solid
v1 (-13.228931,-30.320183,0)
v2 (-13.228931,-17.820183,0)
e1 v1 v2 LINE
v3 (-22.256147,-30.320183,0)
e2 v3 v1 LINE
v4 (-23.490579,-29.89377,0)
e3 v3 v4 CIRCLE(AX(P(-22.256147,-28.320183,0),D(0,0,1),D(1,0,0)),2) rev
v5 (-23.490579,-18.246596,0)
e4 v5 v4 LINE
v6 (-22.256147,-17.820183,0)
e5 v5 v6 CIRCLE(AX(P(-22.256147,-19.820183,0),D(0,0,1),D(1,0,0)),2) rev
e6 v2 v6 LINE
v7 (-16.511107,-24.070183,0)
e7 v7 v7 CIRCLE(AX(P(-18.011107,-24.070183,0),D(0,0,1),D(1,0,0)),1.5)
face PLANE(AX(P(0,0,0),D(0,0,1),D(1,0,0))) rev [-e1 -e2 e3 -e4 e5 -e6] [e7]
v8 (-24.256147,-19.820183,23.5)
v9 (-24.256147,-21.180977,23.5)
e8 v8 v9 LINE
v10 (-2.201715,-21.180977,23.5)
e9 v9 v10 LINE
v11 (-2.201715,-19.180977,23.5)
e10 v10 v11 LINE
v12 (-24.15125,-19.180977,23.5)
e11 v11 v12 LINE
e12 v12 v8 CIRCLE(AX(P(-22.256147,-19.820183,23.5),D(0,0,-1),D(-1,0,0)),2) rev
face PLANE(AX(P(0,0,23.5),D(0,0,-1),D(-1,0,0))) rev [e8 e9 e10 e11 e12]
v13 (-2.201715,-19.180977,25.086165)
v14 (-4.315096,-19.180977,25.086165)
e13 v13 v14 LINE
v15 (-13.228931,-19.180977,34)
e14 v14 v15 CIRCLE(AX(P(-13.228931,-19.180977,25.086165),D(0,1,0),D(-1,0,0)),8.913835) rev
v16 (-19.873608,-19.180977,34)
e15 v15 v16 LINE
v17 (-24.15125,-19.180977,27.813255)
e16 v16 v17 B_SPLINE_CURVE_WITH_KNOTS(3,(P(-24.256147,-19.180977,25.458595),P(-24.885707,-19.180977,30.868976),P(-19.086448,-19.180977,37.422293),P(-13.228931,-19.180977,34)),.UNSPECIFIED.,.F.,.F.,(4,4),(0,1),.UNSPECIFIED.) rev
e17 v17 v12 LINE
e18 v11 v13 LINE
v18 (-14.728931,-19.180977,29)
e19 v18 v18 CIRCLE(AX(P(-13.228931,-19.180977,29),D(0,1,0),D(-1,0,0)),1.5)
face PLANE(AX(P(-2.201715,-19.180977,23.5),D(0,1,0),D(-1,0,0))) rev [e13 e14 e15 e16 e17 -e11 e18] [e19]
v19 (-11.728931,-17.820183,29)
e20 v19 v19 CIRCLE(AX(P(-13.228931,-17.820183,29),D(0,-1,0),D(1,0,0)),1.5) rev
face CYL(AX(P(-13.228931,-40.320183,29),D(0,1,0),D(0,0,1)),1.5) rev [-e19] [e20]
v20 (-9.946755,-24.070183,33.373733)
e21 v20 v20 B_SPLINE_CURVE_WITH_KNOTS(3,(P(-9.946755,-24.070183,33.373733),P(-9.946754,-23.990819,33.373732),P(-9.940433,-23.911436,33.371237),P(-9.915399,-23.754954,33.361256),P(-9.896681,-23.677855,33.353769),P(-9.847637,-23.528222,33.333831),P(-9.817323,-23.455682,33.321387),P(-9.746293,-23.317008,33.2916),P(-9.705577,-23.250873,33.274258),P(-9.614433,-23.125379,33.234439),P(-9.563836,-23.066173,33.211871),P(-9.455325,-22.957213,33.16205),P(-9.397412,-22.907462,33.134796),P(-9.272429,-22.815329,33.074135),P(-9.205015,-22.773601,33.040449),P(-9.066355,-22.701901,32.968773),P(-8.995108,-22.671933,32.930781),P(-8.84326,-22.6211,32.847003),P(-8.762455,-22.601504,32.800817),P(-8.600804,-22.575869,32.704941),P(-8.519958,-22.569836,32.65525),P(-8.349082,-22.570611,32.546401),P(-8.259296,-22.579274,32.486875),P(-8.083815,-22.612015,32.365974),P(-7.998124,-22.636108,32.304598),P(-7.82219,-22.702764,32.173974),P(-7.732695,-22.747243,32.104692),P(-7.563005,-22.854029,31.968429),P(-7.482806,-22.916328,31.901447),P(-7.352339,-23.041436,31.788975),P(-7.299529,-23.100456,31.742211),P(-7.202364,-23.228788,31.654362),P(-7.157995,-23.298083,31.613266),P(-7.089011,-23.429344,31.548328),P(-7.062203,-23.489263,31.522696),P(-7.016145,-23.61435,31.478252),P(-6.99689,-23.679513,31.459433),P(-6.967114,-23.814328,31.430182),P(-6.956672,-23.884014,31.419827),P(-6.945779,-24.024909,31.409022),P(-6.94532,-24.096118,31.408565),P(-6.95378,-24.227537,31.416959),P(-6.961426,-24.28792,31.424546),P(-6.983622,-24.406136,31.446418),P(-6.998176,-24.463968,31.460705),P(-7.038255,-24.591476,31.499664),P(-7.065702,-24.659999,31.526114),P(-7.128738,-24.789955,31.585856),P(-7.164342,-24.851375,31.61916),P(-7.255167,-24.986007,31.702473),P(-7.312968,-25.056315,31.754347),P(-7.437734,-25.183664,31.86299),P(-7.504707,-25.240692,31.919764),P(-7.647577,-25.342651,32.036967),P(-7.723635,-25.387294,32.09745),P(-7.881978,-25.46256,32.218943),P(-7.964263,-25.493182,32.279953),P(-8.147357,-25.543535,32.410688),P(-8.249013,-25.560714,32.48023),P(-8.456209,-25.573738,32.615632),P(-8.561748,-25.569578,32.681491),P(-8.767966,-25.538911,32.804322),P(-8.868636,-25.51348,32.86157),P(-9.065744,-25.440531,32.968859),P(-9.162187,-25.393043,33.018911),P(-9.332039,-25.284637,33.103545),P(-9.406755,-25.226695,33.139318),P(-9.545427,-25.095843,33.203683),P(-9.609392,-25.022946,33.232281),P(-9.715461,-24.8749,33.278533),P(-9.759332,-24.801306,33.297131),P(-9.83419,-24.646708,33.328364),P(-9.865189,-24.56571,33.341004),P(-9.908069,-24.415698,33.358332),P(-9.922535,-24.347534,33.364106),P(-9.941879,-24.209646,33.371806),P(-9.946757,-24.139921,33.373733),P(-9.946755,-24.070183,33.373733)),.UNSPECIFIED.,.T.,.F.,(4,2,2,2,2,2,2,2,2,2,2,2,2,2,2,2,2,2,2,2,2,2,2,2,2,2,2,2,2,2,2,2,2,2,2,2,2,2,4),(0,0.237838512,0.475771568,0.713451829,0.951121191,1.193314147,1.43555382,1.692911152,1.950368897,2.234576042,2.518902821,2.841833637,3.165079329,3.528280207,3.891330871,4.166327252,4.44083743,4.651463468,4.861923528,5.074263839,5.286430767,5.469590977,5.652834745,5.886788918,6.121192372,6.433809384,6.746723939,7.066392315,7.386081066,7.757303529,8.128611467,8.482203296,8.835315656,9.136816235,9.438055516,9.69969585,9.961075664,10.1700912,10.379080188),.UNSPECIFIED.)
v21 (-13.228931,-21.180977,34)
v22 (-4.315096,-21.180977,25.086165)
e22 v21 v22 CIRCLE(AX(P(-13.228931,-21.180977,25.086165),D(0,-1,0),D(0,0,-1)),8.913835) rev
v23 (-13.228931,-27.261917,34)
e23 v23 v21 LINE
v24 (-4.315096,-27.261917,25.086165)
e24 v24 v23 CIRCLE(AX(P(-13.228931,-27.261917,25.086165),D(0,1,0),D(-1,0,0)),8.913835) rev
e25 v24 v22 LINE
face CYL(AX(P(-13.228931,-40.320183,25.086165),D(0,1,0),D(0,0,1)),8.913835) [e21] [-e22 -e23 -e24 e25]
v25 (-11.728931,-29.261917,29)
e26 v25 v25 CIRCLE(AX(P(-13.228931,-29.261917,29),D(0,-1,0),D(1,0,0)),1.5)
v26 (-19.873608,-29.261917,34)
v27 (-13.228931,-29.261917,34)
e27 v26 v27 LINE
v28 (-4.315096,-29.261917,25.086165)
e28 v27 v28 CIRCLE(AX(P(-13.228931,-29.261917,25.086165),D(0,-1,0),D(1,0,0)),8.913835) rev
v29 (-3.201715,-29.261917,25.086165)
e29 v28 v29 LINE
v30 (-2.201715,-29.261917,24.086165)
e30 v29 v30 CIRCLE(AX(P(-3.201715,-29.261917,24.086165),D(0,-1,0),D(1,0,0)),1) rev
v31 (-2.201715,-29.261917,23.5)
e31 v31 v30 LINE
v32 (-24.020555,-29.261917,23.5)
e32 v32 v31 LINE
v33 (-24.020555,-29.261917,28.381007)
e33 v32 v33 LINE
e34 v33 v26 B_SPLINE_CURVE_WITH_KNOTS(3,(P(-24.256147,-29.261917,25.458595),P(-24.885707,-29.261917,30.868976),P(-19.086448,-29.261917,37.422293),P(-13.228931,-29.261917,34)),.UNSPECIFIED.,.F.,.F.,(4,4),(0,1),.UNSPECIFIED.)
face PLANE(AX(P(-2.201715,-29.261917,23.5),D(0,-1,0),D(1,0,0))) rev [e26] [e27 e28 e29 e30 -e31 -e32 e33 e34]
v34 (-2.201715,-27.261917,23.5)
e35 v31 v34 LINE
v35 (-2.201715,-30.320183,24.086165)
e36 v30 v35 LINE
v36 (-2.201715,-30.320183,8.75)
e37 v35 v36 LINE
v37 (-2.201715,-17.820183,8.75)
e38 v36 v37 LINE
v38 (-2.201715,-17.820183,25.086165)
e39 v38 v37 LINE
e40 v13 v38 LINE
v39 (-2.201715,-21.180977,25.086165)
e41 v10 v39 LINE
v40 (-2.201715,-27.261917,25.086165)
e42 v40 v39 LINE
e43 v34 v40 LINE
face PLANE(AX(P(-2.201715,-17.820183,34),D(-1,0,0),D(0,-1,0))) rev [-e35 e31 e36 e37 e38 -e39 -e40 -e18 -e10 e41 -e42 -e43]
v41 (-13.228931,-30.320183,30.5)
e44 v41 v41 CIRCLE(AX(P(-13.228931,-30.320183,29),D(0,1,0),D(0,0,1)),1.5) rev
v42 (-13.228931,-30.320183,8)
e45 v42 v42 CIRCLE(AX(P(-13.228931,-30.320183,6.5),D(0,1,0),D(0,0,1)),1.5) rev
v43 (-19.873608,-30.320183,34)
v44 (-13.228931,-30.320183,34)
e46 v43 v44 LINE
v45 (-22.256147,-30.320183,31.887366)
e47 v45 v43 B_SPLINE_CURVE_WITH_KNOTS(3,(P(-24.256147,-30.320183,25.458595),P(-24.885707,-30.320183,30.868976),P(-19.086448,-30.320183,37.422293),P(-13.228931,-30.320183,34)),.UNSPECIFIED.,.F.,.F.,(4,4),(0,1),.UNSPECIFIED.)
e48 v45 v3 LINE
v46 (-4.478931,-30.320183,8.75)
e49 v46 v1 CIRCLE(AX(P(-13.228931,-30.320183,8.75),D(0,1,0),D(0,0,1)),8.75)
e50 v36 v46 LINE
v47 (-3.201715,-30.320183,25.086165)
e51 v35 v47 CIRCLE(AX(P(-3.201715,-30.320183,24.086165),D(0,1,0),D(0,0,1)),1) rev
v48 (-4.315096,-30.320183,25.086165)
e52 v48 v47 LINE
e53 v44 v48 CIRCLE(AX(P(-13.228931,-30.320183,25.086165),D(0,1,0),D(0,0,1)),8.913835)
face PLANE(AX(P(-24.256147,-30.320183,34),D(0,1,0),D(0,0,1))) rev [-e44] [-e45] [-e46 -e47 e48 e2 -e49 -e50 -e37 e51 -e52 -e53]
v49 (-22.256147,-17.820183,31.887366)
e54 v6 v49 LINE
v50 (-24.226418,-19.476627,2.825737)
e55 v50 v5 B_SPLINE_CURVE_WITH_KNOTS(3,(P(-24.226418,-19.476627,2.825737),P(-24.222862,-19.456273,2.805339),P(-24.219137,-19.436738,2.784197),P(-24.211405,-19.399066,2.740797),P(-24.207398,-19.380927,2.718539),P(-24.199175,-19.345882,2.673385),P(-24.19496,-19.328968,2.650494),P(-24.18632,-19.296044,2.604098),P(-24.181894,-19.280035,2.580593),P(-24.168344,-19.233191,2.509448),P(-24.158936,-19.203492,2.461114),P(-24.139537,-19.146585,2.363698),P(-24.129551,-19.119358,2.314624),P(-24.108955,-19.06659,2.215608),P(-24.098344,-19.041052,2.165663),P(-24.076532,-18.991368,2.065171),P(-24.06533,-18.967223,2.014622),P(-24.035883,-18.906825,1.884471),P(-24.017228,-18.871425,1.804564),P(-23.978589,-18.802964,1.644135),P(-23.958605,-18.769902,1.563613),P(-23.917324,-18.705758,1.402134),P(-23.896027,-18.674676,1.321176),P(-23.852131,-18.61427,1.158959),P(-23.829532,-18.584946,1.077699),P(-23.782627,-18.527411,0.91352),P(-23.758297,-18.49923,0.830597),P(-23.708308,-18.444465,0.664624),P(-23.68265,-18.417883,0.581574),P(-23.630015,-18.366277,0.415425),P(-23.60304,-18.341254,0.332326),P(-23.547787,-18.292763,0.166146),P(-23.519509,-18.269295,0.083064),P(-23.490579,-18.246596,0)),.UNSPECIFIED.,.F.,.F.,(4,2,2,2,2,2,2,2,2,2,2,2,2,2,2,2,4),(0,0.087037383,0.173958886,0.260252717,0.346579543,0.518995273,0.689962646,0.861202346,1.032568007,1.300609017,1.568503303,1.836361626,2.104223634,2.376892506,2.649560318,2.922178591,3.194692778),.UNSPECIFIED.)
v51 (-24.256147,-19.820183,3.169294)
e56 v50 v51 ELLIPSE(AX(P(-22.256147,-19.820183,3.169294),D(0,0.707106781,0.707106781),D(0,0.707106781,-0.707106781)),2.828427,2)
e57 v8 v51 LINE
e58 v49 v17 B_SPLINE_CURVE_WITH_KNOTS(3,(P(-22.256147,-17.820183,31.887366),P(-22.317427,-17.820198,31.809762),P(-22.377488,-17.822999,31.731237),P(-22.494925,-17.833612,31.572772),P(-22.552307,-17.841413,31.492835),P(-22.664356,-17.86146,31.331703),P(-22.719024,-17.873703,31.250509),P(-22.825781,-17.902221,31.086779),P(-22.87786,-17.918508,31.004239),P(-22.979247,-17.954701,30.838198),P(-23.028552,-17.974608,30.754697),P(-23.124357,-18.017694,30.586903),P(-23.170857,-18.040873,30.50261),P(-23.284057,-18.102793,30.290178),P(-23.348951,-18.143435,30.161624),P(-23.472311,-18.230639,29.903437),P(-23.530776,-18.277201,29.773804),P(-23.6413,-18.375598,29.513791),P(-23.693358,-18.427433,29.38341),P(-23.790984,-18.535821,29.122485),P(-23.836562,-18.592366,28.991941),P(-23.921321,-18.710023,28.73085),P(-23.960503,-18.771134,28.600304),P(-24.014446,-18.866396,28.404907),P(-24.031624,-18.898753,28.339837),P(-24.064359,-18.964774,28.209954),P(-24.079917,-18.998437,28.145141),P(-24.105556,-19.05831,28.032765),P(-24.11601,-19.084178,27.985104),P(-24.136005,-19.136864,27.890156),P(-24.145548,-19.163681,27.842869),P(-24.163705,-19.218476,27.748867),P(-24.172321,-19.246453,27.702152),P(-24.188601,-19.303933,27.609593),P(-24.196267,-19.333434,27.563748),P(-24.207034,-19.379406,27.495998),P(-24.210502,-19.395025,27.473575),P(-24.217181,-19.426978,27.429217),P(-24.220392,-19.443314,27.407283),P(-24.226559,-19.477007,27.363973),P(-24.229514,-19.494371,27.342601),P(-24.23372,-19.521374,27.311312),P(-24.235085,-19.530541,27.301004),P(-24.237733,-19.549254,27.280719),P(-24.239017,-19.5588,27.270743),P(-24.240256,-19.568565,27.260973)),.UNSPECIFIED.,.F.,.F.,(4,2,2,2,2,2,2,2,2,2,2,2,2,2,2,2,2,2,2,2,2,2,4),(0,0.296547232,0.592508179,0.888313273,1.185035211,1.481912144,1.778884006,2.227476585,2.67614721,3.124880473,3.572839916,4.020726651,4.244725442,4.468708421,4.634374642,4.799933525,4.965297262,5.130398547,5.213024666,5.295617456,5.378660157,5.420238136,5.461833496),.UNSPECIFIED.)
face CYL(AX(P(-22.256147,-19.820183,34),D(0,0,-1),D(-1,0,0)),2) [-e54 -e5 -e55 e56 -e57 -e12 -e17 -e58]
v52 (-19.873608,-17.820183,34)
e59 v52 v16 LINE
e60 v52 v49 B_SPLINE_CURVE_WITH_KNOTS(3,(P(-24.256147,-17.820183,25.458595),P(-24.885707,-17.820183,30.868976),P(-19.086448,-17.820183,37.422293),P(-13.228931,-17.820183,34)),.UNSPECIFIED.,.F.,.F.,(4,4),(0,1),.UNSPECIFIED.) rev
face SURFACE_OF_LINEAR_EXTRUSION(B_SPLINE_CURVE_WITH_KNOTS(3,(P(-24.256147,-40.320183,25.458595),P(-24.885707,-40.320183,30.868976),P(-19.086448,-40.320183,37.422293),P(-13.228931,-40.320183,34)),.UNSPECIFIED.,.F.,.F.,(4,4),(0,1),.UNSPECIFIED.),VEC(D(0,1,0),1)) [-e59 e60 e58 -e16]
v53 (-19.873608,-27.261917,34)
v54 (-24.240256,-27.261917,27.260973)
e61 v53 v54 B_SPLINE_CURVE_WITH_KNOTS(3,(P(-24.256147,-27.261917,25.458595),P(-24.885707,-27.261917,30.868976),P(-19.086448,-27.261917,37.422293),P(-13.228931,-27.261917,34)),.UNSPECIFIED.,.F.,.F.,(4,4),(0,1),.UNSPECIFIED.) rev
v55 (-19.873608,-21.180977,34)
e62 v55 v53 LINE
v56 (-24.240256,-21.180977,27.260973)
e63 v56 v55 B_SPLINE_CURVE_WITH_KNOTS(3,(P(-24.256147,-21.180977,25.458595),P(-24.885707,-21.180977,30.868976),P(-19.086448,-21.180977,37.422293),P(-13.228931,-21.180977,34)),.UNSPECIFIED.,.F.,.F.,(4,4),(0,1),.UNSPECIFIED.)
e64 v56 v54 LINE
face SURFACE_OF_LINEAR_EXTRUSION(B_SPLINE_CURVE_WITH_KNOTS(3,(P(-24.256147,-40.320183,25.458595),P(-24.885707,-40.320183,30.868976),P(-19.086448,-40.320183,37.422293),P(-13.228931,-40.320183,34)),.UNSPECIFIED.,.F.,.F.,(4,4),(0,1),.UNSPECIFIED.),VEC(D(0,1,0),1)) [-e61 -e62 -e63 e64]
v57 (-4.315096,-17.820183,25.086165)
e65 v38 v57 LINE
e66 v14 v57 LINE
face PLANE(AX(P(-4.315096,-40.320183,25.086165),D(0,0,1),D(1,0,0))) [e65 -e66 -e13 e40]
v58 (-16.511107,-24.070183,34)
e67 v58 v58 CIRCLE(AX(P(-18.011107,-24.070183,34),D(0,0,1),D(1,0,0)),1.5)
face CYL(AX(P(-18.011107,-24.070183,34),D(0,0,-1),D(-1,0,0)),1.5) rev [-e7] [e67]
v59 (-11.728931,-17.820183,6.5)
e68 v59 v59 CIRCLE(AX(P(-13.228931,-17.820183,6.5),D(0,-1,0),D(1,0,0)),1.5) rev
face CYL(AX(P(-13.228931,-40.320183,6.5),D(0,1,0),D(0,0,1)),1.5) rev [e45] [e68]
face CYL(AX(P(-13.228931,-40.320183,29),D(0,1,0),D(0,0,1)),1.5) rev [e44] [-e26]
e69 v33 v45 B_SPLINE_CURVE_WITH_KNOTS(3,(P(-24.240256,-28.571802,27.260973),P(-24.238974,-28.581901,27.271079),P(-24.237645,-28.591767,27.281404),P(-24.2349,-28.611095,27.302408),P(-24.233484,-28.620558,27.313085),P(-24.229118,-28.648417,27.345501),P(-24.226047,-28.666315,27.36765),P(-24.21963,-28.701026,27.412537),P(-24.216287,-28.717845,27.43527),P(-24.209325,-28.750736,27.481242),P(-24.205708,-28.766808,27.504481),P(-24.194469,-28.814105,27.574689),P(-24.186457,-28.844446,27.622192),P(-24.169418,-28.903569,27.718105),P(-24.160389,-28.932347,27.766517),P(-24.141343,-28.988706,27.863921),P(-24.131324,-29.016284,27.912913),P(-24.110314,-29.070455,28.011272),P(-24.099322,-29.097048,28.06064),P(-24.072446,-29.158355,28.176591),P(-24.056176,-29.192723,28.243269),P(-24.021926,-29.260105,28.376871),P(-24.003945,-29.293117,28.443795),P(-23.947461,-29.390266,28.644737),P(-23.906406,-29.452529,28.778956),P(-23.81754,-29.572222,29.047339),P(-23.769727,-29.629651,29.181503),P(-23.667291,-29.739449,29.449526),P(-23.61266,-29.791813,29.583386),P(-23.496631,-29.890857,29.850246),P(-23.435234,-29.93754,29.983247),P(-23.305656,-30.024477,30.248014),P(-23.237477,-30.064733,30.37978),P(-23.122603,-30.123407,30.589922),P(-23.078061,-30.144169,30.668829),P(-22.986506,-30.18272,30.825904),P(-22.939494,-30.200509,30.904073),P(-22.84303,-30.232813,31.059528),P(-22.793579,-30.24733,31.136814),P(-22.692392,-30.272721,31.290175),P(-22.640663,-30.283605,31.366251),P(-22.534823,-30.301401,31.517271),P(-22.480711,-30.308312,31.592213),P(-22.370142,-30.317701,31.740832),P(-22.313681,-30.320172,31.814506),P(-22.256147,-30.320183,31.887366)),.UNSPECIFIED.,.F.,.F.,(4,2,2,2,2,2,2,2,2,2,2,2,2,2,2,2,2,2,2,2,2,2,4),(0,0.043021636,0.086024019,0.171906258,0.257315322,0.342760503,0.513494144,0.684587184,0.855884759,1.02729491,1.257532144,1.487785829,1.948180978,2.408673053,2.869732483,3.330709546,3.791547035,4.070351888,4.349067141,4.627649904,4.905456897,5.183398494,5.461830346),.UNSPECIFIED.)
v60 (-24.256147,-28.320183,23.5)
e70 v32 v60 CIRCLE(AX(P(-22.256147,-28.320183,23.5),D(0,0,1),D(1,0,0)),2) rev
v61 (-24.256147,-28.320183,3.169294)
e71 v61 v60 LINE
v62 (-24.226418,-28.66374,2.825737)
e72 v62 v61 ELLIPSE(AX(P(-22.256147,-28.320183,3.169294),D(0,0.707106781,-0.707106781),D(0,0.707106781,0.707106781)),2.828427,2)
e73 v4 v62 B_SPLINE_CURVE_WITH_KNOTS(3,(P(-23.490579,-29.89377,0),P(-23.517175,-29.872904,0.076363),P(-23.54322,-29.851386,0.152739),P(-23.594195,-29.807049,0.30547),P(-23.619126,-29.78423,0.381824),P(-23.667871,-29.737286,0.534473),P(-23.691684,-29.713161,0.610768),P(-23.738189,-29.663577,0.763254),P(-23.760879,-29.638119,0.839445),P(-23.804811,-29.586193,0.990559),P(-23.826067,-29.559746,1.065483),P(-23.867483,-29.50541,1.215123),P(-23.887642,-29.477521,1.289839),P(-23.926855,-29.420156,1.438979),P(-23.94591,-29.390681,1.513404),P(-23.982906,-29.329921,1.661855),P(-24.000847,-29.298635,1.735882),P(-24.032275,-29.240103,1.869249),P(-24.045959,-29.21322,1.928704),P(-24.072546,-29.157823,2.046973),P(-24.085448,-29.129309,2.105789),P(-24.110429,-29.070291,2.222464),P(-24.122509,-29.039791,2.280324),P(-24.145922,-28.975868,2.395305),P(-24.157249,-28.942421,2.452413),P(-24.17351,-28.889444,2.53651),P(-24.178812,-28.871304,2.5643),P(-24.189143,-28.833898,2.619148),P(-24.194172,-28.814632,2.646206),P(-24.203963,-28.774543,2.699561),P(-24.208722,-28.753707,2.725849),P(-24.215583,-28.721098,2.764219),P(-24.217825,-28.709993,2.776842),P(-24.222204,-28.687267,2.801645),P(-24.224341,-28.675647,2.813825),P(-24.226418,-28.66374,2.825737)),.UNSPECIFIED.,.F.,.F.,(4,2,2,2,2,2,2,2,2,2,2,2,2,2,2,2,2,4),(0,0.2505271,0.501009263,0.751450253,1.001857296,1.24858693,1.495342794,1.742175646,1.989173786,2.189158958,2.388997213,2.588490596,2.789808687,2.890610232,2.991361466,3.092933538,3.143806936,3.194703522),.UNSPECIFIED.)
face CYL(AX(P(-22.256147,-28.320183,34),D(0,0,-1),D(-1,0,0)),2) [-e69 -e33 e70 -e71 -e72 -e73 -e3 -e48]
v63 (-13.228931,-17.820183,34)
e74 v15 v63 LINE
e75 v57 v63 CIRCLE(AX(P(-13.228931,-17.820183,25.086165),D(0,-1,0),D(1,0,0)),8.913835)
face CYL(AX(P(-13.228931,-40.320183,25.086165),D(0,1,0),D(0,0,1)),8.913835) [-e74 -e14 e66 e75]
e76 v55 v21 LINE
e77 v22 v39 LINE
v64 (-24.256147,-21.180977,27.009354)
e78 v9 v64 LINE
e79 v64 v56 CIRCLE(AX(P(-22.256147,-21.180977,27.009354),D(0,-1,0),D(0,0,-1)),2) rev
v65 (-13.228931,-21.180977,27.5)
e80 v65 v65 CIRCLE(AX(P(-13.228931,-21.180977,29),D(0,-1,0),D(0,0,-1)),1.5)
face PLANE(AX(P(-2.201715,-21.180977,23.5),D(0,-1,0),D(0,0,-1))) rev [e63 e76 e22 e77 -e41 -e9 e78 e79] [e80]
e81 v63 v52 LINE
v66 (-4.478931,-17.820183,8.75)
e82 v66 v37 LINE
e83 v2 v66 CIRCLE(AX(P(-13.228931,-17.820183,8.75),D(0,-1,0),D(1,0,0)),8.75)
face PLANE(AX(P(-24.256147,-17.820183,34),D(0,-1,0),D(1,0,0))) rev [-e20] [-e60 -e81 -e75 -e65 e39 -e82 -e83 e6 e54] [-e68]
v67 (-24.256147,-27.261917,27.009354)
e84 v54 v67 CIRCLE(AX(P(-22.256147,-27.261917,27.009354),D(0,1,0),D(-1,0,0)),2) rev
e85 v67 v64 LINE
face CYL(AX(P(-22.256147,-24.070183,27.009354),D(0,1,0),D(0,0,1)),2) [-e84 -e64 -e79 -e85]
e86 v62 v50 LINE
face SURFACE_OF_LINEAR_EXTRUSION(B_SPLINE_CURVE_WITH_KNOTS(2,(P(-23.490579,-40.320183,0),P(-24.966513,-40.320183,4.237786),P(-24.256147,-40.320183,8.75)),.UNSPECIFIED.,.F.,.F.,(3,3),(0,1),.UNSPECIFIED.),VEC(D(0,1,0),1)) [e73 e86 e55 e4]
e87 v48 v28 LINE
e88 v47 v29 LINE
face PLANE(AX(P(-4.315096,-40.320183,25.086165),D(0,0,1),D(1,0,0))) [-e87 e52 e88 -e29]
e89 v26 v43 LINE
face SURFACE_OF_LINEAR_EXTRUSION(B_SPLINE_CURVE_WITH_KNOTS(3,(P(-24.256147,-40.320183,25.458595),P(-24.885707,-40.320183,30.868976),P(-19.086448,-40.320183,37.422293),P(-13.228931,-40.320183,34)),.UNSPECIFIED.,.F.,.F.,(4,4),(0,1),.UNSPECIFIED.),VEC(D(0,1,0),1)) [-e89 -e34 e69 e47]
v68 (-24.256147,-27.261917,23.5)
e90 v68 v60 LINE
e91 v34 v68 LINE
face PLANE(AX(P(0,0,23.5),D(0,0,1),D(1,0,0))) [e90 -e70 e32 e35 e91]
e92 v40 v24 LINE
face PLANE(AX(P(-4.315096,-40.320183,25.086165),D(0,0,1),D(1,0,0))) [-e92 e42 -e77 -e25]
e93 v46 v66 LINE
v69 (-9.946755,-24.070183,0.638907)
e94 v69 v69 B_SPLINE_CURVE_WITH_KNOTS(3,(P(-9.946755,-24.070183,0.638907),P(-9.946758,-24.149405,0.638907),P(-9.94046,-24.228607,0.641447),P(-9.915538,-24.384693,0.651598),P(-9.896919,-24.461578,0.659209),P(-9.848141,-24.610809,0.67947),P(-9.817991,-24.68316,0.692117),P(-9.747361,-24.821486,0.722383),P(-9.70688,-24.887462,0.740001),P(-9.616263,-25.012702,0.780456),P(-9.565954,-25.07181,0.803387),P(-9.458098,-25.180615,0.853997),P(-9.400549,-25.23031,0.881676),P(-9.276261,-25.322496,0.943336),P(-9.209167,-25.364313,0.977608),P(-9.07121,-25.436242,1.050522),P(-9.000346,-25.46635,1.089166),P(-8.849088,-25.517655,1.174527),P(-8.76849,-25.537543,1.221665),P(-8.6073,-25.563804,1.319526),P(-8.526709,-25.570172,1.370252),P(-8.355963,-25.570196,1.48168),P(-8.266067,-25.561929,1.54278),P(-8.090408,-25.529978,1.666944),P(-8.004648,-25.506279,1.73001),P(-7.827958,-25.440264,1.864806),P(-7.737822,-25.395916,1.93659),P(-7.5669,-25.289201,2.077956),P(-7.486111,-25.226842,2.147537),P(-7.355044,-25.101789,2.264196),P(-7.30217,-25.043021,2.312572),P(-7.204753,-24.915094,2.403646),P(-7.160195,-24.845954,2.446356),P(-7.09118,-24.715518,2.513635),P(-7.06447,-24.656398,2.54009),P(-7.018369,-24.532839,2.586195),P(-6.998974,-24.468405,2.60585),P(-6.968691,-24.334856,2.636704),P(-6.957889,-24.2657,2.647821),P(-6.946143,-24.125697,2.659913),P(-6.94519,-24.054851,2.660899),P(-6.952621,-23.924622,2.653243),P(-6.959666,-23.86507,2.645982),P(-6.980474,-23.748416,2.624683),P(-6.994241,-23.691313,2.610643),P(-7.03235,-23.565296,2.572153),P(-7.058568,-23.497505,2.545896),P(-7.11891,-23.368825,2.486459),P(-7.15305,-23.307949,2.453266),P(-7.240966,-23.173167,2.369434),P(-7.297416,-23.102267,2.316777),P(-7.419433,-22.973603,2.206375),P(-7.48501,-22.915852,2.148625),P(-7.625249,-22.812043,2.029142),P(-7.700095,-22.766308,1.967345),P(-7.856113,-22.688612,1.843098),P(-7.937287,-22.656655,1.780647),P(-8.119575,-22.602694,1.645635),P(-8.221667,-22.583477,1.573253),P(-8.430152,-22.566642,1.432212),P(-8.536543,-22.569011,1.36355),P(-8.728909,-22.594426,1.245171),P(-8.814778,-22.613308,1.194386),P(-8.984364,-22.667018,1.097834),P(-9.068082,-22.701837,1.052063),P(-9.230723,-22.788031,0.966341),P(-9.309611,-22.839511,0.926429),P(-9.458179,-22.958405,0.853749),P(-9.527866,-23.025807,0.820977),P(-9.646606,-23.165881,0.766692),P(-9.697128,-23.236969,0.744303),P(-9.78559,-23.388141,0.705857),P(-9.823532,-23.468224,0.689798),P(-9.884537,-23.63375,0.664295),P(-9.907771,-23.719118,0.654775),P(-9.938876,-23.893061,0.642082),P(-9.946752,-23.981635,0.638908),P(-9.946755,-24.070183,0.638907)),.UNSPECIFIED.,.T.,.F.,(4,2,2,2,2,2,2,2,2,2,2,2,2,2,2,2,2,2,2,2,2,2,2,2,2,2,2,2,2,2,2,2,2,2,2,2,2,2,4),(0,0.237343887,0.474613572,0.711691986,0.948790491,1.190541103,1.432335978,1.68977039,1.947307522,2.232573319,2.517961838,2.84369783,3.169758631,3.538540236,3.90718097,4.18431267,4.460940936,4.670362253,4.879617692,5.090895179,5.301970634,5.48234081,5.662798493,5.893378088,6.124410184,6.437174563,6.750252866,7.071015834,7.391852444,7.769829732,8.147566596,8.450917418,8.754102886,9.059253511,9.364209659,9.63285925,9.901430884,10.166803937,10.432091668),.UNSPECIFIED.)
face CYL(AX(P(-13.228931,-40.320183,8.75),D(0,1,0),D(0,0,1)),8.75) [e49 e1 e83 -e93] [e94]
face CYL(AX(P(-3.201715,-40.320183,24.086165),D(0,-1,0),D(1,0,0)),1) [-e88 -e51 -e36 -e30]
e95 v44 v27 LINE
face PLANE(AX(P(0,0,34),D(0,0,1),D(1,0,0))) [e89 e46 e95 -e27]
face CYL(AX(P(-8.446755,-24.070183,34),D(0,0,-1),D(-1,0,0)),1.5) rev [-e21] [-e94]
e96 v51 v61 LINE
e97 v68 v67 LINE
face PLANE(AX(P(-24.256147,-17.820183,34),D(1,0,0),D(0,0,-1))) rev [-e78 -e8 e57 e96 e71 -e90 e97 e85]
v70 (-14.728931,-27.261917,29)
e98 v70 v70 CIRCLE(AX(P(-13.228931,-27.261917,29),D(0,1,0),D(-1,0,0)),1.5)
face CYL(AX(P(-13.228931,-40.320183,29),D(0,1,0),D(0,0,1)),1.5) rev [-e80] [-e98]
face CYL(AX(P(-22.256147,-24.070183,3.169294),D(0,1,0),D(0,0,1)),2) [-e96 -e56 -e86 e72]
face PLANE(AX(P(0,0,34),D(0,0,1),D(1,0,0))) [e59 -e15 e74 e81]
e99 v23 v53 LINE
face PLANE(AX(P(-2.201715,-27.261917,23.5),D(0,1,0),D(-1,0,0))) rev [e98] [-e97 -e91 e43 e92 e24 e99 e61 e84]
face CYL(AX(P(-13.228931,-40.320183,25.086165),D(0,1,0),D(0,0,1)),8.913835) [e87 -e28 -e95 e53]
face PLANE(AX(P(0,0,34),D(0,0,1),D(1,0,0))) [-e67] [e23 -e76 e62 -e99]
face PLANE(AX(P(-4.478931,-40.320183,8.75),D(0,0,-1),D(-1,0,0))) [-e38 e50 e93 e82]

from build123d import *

# Parameters (mm, degrees)
SKETCH1_W               = 22.054431489
SKETCH1_H               = 12.5
BOSS_EXTRUDE1_DEPTH     = 34
CUT_EXTRUDE1_DEPTH      = 10
CUT_EXTRUDE1_DEPTH_BACK = 15
SKETCH2_R               = 1.5
FILLET3_R               = 2
SKETCH5_R               = 1.5
CUT_EXTRUDE4_DEPTH      = 52.610795679
SKETCH16_W              = 22.05443149
SKETCH16_H              = 2
CUT_EXTRUDE6_DEPTH      = 14.5
FILLET4_R               = 1


with BuildPart() as part:
    # Sketch1 → Boss-Extrude1 (new body)
    with BuildSketch(Plane.XY):
        with Locations((-13.228930986, -24.070183414)):
            Rectangle(SKETCH1_W, SKETCH1_H)
    extrude(amount=BOSS_EXTRUDE1_DEPTH)

    # Sketch2 → Cut-Extrude1 (cut, two sides: drawn at the far end of the back side and taken through both)
    with BuildSketch(Plane.XZ.offset(30.320183414).offset(-CUT_EXTRUDE1_DEPTH_BACK)):
        with Locations(Location((-13.228930986, 6.5, 0), (0, 0, 90))):
            Circle(SKETCH2_R)
        with Locations(Location((-13.228930986, 29, 0), (0, 0, 90))):
            Circle(SKETCH2_R)
        with BuildLine():
            Line((-4.315096089, 25.086165103), (-2.201715242, 25.086165103))
            add(Edge.make_bspline(
                [(-24.256146731, 25.458595261), (-35.656041951, 36.540332573), (-13.006901701, 52.285060009), (9.32231541, 36.338450422), (-2.201715242, 25.086165103)],
                knots=[0, 0, 0, 0, 0.496841919, 1, 1, 1, 1], degree=3))
            add(Edge.make_bspline(
                [(-13.228930986, 34), (-19.086447972, 37.422293362), (-24.885707195, 30.868976401), (-24.256146731, 25.458595261)],
                knots=[0, 0, 0, 0, 1, 1, 1, 1], degree=3))
            ThreePointArc((-13.228930986, 34), (-6.925897884, 31.389198205), (-4.315096089, 25.086165103))
        make_face()
        with BuildLine():
            Line((-4.478930986, 8.75), (-2.201715242, 8.75))
            add(Edge.make_bspline(
                [(-2.201715242, 8.75), (5.39210746, 3.880294823), (-0.777052631, -4.523329032), (-17.174300591, -10.623347238), (-34.821400648, -0.026005424), (-24.256146731, 8.75)],
                knots=[0, 0, 0, 0, 0.283272691, 0.504244858, 1, 1, 1, 1], degree=3))
            add(Edge.make_bspline(
                [(-23.490579314, 0), (-24.966512963, 4.237786421), (-24.256146731, 8.75)],
                knots=[0, 0, 0, 1, 1, 1], degree=2))
            Line((-23.490579314, 0), (-13.228930986, 0))
            ThreePointArc((-13.228930986, 0), (-7.041746651, 2.562815665), (-4.478930986, 8.75))
        make_face()
    extrude(amount=CUT_EXTRUDE1_DEPTH + CUT_EXTRUDE1_DEPTH_BACK, mode=Mode.SUBTRACT)

    # Fillet3
    # the kernel refuses this fillet: 2 mm, written as the material it takes off along each edge
    with BuildSketch(Plane(origin=(-24.256146731, -17.820183414, -1.998495188), x_dir=(1, 0, 0), z_dir=(0, 0, 1))) as fillet3_piece_1:
        with BuildLine():
            CenterArc((FILLET3_R, -FILLET3_R), FILLET3_R, 90, 90)
            Line((0, -FILLET3_R), (0, 0))
            Line((0, 0), (FILLET3_R, 0))
        make_face()
    extrude(amount=34.125242274, mode=Mode.SUBTRACT)
    with BuildSketch(Plane(origin=(-24.256146731, -30.320183414, -1.998495188), x_dir=(1, 0, 0), z_dir=(0, 0, 1))) as fillet3_piece_2:
        with BuildLine():
            CenterArc((FILLET3_R, FILLET3_R), FILLET3_R, 180, 90)
            Line((0, FILLET3_R), (0, 0))
            Line((0, 0), (FILLET3_R, 0))
        make_face()
    extrude(amount=34.125242274, mode=Mode.SUBTRACT)
    with BuildSketch(Plane(origin=(-24.256146731, -17.374523396, 3.001504812), x_dir=(0.1667681859257429, 1.4874647964432132e-15, -0.9859961319209304), z_dir=(0, -1, 0))) as fillet3_piece_3:
        with BuildLine():
            CenterArc((0.168096911, 1.999974157), FILLET3_R, 260.400032587, 9.891234523)
            Line((-0.165439461, 0.027981894), (0, 0))
            ThreePointArc((0, 0), (0.089132004, -0.000226606), (0.178264007, 0))
        make_face()
    extrude(amount=13.331280444, mode=Mode.SUBTRACT)
    with BuildSketch(Plane(origin=(-24.256146731, -17.482274803, 27.126747086), x_dir=(0.11756979569322837, -1.02728794699617e-15, 0.9930646218351818), z_dir=(0, -1, 0))) as fillet3_piece_4:
        with BuildLine():
            CenterArc((0.118560979, -1.999931088), FILLET3_R, 89.524368939, 7.227500304)
            Line((-0.116578613, -0.013801845), (0, 0))
            ThreePointArc((0, 0), (0.067581725, 0.000281106), (0.135163444, 0))
        make_face()
    extrude(amount=13.131401648, mode=Mode.SUBTRACT)

    # Sketch5 → Cut-Extrude4 (cut, through all)
    with BuildSketch(Plane.XY):
        with Locations((-18.011106811, -24.070183414)):
            Circle(SKETCH5_R)
        with Locations(Location((-8.446755162, -24.070183414, 0), (0, 0, 180))):
            Circle(SKETCH5_R)
    extrude(amount=CUT_EXTRUDE4_DEPTH, mode=Mode.SUBTRACT)

    # Sketch16 → Cut-Extrude6 (cut)
    with BuildSketch(Plane.XY.offset(38)):
        with Locations((-13.228930985, -20.1809771)):
            Rectangle(SKETCH16_W, SKETCH16_H)
        with Locations((-13.228930985, -28.261916897)):
            Rectangle(SKETCH16_W, SKETCH16_H)
    extrude(amount=-CUT_EXTRUDE6_DEPTH, mode=Mode.SUBTRACT)

    # Fillet4
    fillet4_edges = [part.edges().sort_by_distance(p)[0] for p in [
        (-2.201715242, -29.791050155, 25.086165103),
    ]]
    fillet(fillet4_edges, radius=FILLET4_R)


solid = part.part
